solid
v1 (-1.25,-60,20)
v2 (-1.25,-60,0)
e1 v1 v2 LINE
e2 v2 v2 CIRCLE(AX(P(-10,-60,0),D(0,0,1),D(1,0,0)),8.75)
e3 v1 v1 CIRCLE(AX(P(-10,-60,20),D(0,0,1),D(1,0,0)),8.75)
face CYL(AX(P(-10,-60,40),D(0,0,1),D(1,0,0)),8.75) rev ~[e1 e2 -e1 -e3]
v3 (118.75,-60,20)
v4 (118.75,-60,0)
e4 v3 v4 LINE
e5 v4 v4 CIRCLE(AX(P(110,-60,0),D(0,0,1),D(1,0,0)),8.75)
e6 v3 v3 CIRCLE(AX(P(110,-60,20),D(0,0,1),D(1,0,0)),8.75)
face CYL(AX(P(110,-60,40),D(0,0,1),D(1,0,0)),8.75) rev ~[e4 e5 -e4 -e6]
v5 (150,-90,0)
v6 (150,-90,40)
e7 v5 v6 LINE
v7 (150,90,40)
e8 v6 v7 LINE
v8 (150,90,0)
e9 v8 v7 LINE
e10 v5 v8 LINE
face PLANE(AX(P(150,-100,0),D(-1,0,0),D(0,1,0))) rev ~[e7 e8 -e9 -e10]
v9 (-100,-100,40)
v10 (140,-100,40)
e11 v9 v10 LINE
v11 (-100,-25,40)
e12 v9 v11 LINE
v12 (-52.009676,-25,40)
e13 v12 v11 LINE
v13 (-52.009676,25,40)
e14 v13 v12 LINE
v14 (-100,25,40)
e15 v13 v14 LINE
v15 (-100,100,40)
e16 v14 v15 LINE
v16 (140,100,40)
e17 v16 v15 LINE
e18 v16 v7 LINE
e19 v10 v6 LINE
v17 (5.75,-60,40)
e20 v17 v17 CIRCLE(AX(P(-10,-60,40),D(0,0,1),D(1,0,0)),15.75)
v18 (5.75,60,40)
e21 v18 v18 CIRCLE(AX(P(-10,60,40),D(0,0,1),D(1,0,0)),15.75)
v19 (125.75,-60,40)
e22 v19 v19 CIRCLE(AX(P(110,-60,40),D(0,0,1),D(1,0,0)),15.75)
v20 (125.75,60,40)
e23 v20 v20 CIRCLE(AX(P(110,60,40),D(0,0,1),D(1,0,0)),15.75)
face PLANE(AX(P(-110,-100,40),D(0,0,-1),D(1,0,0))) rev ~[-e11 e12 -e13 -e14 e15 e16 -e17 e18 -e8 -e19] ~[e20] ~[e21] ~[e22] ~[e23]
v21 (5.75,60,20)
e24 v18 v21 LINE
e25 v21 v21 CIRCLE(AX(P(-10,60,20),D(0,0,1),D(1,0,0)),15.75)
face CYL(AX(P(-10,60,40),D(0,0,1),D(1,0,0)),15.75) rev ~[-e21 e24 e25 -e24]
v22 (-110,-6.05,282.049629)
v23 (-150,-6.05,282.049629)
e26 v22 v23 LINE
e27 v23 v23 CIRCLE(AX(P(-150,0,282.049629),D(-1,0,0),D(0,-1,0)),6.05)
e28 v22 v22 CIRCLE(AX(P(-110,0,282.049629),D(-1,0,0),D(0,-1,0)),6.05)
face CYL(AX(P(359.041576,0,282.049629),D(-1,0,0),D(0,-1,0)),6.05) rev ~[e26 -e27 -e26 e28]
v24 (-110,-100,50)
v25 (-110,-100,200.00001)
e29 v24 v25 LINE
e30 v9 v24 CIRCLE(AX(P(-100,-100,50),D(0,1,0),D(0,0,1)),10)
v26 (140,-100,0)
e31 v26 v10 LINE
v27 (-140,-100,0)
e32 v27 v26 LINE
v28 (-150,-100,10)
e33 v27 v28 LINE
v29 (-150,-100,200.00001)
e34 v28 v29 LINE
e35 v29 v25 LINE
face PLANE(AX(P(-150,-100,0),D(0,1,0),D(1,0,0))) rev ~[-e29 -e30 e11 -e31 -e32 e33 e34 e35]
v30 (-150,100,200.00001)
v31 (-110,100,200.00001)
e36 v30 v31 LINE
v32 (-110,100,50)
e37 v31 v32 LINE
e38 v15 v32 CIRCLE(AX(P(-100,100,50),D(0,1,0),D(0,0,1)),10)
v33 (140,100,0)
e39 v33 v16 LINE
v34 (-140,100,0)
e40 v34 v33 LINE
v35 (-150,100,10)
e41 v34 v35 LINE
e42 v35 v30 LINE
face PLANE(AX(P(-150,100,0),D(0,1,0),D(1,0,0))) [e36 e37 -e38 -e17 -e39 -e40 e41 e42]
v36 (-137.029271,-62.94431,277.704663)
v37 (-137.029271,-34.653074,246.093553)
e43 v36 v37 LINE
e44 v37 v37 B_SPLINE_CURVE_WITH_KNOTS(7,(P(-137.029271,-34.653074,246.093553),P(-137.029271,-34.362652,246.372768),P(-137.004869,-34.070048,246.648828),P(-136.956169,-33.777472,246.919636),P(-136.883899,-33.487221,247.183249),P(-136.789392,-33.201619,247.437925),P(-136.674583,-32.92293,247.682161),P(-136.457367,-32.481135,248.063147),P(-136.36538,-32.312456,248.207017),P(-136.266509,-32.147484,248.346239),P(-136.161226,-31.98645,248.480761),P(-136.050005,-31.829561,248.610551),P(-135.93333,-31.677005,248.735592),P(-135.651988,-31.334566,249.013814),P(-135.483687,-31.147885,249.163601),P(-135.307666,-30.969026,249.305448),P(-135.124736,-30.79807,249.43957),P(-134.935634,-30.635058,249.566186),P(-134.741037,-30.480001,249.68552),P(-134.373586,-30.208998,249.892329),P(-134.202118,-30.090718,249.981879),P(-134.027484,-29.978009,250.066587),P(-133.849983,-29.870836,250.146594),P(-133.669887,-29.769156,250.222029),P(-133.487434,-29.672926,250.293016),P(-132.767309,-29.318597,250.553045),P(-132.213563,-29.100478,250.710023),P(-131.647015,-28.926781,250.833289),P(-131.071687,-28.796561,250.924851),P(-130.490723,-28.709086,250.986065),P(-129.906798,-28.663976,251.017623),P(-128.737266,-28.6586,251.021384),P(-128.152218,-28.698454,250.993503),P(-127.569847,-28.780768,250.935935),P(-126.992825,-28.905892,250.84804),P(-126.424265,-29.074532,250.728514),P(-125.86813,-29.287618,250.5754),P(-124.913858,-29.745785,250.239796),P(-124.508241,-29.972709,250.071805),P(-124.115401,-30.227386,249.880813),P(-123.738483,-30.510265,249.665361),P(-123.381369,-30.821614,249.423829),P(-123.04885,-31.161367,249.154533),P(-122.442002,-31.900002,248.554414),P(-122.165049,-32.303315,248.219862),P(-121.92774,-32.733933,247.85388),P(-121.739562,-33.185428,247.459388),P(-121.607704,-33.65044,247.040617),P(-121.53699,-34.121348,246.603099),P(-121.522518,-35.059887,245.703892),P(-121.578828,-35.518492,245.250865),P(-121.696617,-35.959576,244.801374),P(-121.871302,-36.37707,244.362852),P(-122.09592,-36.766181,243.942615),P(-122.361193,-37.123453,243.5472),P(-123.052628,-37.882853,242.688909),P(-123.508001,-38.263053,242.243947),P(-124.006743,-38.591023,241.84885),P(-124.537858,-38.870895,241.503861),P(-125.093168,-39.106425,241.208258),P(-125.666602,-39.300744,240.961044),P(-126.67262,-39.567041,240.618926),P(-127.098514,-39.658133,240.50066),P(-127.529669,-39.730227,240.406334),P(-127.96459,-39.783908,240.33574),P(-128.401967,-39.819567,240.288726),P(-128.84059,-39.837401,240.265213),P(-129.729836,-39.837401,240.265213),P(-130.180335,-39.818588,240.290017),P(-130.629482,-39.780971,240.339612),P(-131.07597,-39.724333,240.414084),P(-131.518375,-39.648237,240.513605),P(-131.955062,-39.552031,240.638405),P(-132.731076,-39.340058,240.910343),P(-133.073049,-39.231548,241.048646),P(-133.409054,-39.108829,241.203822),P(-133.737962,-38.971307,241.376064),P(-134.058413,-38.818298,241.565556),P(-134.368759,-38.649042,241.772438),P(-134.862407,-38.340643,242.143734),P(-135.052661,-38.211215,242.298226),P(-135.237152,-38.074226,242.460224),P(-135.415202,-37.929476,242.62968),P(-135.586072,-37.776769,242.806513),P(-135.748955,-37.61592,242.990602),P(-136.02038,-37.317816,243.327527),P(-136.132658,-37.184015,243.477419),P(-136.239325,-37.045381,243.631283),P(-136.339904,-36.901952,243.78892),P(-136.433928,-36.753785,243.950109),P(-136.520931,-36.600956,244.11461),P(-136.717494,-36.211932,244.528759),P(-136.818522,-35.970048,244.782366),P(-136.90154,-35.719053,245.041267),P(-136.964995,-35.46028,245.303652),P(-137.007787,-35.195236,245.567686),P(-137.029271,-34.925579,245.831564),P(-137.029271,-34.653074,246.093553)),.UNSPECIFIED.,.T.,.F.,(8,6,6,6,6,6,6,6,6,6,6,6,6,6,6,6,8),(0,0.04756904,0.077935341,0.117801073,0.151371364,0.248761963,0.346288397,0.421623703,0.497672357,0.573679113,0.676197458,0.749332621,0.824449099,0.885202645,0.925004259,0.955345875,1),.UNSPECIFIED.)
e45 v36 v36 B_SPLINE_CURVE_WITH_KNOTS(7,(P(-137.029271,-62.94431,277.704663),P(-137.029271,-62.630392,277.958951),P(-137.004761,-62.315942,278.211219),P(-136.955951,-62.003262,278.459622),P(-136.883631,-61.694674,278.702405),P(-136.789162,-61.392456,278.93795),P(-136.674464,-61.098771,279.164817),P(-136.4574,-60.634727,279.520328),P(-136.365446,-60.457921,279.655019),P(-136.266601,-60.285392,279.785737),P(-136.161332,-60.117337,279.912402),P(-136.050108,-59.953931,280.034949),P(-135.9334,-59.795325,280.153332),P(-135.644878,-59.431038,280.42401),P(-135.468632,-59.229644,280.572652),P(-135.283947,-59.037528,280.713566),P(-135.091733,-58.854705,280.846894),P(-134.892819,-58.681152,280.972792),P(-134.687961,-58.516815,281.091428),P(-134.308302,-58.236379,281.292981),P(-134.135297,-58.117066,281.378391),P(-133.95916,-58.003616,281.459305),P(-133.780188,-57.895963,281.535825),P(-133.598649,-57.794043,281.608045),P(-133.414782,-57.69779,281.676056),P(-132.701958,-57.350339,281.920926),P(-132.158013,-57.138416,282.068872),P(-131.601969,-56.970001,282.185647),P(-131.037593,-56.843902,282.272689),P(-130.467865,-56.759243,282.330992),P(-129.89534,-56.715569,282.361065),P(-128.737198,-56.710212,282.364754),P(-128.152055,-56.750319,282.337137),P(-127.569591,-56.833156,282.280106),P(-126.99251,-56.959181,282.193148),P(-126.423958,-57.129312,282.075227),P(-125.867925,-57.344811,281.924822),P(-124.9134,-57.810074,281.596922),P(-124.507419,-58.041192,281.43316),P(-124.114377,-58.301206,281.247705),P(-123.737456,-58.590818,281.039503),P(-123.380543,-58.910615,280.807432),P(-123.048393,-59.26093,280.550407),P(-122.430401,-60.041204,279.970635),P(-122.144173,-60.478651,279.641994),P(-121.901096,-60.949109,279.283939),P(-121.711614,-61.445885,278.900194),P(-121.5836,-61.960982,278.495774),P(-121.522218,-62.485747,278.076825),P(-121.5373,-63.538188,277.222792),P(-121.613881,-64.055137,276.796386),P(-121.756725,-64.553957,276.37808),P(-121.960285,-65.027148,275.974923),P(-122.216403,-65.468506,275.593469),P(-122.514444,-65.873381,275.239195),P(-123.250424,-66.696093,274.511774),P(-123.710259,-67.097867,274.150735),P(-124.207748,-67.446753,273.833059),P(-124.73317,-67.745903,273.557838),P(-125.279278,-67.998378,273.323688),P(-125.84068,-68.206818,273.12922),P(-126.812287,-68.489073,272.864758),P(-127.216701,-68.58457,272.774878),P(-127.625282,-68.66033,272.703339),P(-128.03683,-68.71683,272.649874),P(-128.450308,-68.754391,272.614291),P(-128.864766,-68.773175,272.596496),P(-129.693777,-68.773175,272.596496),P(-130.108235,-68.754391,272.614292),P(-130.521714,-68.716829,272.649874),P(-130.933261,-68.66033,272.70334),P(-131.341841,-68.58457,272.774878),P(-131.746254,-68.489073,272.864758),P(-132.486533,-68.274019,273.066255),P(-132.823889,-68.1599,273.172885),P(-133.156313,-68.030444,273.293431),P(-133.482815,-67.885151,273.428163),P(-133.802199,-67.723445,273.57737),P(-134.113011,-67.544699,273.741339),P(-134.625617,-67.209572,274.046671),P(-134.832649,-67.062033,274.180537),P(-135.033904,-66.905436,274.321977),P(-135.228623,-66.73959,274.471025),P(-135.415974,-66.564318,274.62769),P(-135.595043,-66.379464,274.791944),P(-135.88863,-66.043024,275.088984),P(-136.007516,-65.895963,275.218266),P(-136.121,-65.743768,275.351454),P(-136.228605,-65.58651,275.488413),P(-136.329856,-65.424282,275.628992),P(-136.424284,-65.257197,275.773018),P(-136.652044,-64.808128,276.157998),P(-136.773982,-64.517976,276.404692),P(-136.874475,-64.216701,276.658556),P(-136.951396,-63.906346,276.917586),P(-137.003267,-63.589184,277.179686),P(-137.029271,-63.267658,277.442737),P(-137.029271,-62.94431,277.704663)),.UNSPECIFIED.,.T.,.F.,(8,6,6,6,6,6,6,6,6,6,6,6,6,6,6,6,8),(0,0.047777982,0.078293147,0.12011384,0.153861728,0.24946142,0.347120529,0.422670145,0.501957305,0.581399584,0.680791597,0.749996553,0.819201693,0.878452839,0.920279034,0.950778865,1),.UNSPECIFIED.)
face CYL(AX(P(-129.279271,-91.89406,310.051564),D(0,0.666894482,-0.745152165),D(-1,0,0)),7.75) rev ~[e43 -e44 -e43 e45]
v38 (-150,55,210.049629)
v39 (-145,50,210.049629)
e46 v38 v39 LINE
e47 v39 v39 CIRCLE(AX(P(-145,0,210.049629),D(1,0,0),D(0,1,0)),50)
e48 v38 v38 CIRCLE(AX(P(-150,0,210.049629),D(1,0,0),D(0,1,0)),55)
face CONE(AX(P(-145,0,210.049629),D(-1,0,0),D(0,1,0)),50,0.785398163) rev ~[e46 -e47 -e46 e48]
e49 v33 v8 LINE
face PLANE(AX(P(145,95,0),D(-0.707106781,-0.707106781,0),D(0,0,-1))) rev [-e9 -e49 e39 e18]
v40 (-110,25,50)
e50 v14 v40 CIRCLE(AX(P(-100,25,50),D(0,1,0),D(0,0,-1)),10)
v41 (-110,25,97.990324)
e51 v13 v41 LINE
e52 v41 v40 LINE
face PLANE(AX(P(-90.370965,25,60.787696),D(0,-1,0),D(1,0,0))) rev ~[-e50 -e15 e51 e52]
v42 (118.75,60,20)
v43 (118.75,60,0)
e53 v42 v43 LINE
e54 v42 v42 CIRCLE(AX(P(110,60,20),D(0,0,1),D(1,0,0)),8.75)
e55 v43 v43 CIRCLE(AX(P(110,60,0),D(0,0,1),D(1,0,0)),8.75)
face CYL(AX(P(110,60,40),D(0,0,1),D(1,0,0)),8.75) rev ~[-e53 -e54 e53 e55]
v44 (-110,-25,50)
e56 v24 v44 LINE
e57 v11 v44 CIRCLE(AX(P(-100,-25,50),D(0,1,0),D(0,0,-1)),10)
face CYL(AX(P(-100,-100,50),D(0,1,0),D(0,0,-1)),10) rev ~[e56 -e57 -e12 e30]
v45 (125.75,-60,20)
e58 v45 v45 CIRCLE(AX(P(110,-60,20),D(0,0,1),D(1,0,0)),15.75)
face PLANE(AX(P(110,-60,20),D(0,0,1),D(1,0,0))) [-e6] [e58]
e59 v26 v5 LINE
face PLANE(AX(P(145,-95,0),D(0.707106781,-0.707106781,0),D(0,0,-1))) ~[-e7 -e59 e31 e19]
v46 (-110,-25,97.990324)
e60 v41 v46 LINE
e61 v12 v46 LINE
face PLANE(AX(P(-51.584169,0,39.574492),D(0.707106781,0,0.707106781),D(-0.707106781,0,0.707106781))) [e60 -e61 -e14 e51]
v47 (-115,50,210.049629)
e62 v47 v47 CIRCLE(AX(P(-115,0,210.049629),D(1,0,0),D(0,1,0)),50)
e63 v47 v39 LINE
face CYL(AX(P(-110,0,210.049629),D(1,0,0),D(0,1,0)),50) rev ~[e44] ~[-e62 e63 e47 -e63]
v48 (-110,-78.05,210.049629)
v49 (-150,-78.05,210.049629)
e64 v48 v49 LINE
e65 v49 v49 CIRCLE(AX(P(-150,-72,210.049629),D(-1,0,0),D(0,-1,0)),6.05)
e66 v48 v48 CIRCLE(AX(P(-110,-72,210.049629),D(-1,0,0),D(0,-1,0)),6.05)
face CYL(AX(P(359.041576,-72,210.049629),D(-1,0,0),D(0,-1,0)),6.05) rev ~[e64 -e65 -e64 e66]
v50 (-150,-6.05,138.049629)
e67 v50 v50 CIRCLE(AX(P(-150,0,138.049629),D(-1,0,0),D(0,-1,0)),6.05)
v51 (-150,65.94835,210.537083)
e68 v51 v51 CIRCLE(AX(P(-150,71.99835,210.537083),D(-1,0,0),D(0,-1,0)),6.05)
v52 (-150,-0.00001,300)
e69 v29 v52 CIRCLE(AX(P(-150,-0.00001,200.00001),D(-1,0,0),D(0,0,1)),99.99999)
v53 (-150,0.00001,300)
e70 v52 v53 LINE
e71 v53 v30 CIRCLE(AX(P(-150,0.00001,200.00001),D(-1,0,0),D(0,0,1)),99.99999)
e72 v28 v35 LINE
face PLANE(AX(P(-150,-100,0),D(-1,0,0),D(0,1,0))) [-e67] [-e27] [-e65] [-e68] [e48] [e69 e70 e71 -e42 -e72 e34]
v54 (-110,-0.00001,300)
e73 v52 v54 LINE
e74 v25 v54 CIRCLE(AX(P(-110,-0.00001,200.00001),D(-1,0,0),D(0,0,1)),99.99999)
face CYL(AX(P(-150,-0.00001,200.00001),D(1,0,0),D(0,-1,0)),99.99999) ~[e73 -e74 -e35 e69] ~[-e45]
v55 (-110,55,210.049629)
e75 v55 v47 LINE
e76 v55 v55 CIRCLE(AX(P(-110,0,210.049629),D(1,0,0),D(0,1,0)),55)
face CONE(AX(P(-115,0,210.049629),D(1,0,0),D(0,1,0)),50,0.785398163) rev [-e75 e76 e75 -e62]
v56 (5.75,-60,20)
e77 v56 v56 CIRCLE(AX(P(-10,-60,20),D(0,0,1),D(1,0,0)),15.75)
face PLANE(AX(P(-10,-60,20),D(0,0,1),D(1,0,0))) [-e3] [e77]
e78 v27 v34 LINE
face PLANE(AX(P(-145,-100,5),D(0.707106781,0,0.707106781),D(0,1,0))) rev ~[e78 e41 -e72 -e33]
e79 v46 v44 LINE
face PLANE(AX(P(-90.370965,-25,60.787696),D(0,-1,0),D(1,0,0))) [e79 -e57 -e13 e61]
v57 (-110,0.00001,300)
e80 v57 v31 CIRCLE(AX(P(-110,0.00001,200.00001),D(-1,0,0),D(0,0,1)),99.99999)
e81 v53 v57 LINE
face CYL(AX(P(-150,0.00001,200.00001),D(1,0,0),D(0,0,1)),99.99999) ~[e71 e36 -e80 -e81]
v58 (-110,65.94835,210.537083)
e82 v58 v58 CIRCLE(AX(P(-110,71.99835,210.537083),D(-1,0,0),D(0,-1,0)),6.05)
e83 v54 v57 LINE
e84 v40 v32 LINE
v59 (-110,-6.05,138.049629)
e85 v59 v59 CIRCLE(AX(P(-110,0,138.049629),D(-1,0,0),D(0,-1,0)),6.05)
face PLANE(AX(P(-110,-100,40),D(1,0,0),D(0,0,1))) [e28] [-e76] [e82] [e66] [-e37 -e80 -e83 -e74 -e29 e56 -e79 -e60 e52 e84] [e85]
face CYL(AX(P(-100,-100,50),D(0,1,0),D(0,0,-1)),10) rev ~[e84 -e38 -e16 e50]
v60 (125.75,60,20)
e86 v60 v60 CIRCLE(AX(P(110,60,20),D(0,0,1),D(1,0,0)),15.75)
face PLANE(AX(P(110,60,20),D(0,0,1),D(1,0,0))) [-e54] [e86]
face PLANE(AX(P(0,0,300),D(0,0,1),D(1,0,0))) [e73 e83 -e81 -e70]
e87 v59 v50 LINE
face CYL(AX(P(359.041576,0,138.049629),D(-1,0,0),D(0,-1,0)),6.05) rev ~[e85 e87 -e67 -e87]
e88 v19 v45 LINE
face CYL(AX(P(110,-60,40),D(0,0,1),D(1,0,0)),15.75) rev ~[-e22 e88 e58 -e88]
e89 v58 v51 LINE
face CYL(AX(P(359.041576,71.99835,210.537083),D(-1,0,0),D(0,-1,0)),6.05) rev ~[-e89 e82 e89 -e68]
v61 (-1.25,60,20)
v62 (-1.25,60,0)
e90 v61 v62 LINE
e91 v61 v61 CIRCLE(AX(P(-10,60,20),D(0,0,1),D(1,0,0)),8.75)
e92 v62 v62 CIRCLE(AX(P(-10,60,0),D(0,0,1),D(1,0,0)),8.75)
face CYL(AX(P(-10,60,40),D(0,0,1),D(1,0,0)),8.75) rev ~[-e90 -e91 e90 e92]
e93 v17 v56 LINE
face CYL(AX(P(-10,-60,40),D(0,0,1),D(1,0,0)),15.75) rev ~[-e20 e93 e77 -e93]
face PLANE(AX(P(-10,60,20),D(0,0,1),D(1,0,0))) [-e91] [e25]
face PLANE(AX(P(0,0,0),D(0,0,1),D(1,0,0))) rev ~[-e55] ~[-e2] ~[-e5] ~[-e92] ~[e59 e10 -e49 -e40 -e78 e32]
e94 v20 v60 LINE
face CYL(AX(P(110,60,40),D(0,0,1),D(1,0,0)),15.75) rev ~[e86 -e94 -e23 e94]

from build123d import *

# Parameters (mm, degrees)
F0_W      = 300
F0_H      = 200
F1_DEPTH  = 300
F2_W      = 260
F2_H      = 260
F3_DEPTH  = 421.64
F4_SIZE   = 10
F5_R      = 10
F6_SIZE   = 10
F7_R      = 8.75
F8_DEPTH  = 79.502
F7_R_2    = 15.75
F9_DEPTH  = 20
F10_R     = 99.99999
F11_R     = 50
F12_DEPTH = 145.034
F13_D     = 12.1
F14_SIZE  = 5
F16_DEPTH = 25
F20_D     = 15.5
F20_DEPTH = 44.0944
F20_START = 0.8055971
F20_TIP   = 4.6566697975


# Not quite as in the source:
# - a fillet or chamfer is up to 0.001 mm smaller than in the source, because OpenCascade refuses the exact size


with BuildPart() as f1:
    # F0 (on Top) → F1 (new body)
    with BuildSketch(Plane.XY):
        Rectangle(F0_W, F0_H)
    extrude(amount=F1_DEPTH)

    # F2 (on face) → F3 (cut)
    with BuildSketch(Plane.XZ.offset(100)):
        with Locations((20, 170)):
            Rectangle(F2_W, F2_H)
    extrude(amount=-F3_DEPTH, mode=Mode.SUBTRACT)

    # F4
    f4_edges = [f1.edges().sort_by_distance(p)[0] for p in [
        (150, -100, 20),
        (150, 100, 20),
    ]]
    chamfer(f4_edges, length=F4_SIZE)

    # F5
    f5_edges = [f1.edges().sort_by_distance(p)[0] for p in [
        (-110, 0, 40),
    ]]
    fillet(f5_edges, radius=F5_R)

    # F6
    f6_edges = [f1.edges().sort_by_distance(p)[0] for p in [
        (-150, 0, 0),
    ]]
    chamfer(f6_edges, length=F6_SIZE)

    # F7 (on face) → F8 (cut)
    with BuildSketch(Plane.XY.offset(40)):
        with Locations((110, -60)):
            Circle(F7_R)
        with Locations((110, 60)):
            Circle(F7_R)
        with Locations((-10, 60)):
            Circle(F7_R)
        with Locations((-10, -60)):
            Circle(F7_R)
    extrude(amount=-F8_DEPTH, mode=Mode.SUBTRACT)

    # F7 (on face) → F9 (cut)
    with BuildSketch(Plane.XY.offset(40)):
        with Locations((-10, 60)):
            Circle(F7_R_2)
        with Locations((-10, 60)):
            Circle(F7_R, mode=Mode.SUBTRACT)
        with Locations((-10, -60)):
            Circle(F7_R_2)
        with Locations((-10, -60)):
            Circle(F7_R, mode=Mode.SUBTRACT)
        with Locations((110, -60)):
            Circle(F7_R_2)
        with Locations((110, -60)):
            Circle(F7_R, mode=Mode.SUBTRACT)
        with Locations((110, 60)):
            Circle(F7_R_2)
        with Locations((110, 60)):
            Circle(F7_R, mode=Mode.SUBTRACT)
    extrude(amount=-F9_DEPTH, mode=Mode.SUBTRACT)

    # F10 (radius 100 in the source; OpenCascade refuses exactly that, so slightly less here)
    f10_edges = [f1.edges().sort_by_distance(p)[0] for p in [
        (-130, -100, 300),
        (-130, 100, 300),
    ]]
    fillet(f10_edges, radius=F10_R)

    # F11 (on face) → F12 (cut)
    with BuildSketch(Plane.YZ.offset(-110)):
        with Locations((0, 210.0496292114)):
            Circle(F11_R)
    extrude(amount=-F12_DEPTH, mode=Mode.SUBTRACT)

    # F13 (through all)
    with Locations(Plane.YZ.offset(-110)):
        with Locations((-72, 210.0496292114), (0, 282.0496292114), (71.9983499009, 210.5370833633), (0, 138.0496292114)):
            Hole(F13_D / 2)

    # F14
    f14_edges = [f1.edges().sort_by_distance(p)[0] for p in [
        (-150, -50, 210.049629),
        (-110, -50, 210.049629),
    ]]
    chamfer(f14_edges, length=F14_SIZE)

    # F15 (on Front) → F16 (join, symmetric)
    with BuildSketch(Plane.XZ):
        Polygon((-51.5841689292, 39.5744924862), (-111.5841689292, 99.5744924862), (-111.5841689292, 39.5744924862), align=None)
    extrude(amount=F16_DEPTH, both=True)

    # F20
    # its depths count from where the whole tool has entered the part; down to there all is cleared
    with Locations(Plane(origin=(0, -166.0770217272, 185.5655664485), x_dir=(1, 0, 0), z_dir=(0, -0.6668944822, 0.7451521654)).offset(-F20_START)):
        with Locations((-129.2792707682, 138.2966190577)):
            Hole(F20_D / 2, depth=F20_DEPTH)
            with Locations((0, 0, -(F20_DEPTH + F20_TIP / 2))):  # 118° drill point
                Cone(0, F20_D / 2, F20_TIP, mode=Mode.SUBTRACT)


solid = f1.part
